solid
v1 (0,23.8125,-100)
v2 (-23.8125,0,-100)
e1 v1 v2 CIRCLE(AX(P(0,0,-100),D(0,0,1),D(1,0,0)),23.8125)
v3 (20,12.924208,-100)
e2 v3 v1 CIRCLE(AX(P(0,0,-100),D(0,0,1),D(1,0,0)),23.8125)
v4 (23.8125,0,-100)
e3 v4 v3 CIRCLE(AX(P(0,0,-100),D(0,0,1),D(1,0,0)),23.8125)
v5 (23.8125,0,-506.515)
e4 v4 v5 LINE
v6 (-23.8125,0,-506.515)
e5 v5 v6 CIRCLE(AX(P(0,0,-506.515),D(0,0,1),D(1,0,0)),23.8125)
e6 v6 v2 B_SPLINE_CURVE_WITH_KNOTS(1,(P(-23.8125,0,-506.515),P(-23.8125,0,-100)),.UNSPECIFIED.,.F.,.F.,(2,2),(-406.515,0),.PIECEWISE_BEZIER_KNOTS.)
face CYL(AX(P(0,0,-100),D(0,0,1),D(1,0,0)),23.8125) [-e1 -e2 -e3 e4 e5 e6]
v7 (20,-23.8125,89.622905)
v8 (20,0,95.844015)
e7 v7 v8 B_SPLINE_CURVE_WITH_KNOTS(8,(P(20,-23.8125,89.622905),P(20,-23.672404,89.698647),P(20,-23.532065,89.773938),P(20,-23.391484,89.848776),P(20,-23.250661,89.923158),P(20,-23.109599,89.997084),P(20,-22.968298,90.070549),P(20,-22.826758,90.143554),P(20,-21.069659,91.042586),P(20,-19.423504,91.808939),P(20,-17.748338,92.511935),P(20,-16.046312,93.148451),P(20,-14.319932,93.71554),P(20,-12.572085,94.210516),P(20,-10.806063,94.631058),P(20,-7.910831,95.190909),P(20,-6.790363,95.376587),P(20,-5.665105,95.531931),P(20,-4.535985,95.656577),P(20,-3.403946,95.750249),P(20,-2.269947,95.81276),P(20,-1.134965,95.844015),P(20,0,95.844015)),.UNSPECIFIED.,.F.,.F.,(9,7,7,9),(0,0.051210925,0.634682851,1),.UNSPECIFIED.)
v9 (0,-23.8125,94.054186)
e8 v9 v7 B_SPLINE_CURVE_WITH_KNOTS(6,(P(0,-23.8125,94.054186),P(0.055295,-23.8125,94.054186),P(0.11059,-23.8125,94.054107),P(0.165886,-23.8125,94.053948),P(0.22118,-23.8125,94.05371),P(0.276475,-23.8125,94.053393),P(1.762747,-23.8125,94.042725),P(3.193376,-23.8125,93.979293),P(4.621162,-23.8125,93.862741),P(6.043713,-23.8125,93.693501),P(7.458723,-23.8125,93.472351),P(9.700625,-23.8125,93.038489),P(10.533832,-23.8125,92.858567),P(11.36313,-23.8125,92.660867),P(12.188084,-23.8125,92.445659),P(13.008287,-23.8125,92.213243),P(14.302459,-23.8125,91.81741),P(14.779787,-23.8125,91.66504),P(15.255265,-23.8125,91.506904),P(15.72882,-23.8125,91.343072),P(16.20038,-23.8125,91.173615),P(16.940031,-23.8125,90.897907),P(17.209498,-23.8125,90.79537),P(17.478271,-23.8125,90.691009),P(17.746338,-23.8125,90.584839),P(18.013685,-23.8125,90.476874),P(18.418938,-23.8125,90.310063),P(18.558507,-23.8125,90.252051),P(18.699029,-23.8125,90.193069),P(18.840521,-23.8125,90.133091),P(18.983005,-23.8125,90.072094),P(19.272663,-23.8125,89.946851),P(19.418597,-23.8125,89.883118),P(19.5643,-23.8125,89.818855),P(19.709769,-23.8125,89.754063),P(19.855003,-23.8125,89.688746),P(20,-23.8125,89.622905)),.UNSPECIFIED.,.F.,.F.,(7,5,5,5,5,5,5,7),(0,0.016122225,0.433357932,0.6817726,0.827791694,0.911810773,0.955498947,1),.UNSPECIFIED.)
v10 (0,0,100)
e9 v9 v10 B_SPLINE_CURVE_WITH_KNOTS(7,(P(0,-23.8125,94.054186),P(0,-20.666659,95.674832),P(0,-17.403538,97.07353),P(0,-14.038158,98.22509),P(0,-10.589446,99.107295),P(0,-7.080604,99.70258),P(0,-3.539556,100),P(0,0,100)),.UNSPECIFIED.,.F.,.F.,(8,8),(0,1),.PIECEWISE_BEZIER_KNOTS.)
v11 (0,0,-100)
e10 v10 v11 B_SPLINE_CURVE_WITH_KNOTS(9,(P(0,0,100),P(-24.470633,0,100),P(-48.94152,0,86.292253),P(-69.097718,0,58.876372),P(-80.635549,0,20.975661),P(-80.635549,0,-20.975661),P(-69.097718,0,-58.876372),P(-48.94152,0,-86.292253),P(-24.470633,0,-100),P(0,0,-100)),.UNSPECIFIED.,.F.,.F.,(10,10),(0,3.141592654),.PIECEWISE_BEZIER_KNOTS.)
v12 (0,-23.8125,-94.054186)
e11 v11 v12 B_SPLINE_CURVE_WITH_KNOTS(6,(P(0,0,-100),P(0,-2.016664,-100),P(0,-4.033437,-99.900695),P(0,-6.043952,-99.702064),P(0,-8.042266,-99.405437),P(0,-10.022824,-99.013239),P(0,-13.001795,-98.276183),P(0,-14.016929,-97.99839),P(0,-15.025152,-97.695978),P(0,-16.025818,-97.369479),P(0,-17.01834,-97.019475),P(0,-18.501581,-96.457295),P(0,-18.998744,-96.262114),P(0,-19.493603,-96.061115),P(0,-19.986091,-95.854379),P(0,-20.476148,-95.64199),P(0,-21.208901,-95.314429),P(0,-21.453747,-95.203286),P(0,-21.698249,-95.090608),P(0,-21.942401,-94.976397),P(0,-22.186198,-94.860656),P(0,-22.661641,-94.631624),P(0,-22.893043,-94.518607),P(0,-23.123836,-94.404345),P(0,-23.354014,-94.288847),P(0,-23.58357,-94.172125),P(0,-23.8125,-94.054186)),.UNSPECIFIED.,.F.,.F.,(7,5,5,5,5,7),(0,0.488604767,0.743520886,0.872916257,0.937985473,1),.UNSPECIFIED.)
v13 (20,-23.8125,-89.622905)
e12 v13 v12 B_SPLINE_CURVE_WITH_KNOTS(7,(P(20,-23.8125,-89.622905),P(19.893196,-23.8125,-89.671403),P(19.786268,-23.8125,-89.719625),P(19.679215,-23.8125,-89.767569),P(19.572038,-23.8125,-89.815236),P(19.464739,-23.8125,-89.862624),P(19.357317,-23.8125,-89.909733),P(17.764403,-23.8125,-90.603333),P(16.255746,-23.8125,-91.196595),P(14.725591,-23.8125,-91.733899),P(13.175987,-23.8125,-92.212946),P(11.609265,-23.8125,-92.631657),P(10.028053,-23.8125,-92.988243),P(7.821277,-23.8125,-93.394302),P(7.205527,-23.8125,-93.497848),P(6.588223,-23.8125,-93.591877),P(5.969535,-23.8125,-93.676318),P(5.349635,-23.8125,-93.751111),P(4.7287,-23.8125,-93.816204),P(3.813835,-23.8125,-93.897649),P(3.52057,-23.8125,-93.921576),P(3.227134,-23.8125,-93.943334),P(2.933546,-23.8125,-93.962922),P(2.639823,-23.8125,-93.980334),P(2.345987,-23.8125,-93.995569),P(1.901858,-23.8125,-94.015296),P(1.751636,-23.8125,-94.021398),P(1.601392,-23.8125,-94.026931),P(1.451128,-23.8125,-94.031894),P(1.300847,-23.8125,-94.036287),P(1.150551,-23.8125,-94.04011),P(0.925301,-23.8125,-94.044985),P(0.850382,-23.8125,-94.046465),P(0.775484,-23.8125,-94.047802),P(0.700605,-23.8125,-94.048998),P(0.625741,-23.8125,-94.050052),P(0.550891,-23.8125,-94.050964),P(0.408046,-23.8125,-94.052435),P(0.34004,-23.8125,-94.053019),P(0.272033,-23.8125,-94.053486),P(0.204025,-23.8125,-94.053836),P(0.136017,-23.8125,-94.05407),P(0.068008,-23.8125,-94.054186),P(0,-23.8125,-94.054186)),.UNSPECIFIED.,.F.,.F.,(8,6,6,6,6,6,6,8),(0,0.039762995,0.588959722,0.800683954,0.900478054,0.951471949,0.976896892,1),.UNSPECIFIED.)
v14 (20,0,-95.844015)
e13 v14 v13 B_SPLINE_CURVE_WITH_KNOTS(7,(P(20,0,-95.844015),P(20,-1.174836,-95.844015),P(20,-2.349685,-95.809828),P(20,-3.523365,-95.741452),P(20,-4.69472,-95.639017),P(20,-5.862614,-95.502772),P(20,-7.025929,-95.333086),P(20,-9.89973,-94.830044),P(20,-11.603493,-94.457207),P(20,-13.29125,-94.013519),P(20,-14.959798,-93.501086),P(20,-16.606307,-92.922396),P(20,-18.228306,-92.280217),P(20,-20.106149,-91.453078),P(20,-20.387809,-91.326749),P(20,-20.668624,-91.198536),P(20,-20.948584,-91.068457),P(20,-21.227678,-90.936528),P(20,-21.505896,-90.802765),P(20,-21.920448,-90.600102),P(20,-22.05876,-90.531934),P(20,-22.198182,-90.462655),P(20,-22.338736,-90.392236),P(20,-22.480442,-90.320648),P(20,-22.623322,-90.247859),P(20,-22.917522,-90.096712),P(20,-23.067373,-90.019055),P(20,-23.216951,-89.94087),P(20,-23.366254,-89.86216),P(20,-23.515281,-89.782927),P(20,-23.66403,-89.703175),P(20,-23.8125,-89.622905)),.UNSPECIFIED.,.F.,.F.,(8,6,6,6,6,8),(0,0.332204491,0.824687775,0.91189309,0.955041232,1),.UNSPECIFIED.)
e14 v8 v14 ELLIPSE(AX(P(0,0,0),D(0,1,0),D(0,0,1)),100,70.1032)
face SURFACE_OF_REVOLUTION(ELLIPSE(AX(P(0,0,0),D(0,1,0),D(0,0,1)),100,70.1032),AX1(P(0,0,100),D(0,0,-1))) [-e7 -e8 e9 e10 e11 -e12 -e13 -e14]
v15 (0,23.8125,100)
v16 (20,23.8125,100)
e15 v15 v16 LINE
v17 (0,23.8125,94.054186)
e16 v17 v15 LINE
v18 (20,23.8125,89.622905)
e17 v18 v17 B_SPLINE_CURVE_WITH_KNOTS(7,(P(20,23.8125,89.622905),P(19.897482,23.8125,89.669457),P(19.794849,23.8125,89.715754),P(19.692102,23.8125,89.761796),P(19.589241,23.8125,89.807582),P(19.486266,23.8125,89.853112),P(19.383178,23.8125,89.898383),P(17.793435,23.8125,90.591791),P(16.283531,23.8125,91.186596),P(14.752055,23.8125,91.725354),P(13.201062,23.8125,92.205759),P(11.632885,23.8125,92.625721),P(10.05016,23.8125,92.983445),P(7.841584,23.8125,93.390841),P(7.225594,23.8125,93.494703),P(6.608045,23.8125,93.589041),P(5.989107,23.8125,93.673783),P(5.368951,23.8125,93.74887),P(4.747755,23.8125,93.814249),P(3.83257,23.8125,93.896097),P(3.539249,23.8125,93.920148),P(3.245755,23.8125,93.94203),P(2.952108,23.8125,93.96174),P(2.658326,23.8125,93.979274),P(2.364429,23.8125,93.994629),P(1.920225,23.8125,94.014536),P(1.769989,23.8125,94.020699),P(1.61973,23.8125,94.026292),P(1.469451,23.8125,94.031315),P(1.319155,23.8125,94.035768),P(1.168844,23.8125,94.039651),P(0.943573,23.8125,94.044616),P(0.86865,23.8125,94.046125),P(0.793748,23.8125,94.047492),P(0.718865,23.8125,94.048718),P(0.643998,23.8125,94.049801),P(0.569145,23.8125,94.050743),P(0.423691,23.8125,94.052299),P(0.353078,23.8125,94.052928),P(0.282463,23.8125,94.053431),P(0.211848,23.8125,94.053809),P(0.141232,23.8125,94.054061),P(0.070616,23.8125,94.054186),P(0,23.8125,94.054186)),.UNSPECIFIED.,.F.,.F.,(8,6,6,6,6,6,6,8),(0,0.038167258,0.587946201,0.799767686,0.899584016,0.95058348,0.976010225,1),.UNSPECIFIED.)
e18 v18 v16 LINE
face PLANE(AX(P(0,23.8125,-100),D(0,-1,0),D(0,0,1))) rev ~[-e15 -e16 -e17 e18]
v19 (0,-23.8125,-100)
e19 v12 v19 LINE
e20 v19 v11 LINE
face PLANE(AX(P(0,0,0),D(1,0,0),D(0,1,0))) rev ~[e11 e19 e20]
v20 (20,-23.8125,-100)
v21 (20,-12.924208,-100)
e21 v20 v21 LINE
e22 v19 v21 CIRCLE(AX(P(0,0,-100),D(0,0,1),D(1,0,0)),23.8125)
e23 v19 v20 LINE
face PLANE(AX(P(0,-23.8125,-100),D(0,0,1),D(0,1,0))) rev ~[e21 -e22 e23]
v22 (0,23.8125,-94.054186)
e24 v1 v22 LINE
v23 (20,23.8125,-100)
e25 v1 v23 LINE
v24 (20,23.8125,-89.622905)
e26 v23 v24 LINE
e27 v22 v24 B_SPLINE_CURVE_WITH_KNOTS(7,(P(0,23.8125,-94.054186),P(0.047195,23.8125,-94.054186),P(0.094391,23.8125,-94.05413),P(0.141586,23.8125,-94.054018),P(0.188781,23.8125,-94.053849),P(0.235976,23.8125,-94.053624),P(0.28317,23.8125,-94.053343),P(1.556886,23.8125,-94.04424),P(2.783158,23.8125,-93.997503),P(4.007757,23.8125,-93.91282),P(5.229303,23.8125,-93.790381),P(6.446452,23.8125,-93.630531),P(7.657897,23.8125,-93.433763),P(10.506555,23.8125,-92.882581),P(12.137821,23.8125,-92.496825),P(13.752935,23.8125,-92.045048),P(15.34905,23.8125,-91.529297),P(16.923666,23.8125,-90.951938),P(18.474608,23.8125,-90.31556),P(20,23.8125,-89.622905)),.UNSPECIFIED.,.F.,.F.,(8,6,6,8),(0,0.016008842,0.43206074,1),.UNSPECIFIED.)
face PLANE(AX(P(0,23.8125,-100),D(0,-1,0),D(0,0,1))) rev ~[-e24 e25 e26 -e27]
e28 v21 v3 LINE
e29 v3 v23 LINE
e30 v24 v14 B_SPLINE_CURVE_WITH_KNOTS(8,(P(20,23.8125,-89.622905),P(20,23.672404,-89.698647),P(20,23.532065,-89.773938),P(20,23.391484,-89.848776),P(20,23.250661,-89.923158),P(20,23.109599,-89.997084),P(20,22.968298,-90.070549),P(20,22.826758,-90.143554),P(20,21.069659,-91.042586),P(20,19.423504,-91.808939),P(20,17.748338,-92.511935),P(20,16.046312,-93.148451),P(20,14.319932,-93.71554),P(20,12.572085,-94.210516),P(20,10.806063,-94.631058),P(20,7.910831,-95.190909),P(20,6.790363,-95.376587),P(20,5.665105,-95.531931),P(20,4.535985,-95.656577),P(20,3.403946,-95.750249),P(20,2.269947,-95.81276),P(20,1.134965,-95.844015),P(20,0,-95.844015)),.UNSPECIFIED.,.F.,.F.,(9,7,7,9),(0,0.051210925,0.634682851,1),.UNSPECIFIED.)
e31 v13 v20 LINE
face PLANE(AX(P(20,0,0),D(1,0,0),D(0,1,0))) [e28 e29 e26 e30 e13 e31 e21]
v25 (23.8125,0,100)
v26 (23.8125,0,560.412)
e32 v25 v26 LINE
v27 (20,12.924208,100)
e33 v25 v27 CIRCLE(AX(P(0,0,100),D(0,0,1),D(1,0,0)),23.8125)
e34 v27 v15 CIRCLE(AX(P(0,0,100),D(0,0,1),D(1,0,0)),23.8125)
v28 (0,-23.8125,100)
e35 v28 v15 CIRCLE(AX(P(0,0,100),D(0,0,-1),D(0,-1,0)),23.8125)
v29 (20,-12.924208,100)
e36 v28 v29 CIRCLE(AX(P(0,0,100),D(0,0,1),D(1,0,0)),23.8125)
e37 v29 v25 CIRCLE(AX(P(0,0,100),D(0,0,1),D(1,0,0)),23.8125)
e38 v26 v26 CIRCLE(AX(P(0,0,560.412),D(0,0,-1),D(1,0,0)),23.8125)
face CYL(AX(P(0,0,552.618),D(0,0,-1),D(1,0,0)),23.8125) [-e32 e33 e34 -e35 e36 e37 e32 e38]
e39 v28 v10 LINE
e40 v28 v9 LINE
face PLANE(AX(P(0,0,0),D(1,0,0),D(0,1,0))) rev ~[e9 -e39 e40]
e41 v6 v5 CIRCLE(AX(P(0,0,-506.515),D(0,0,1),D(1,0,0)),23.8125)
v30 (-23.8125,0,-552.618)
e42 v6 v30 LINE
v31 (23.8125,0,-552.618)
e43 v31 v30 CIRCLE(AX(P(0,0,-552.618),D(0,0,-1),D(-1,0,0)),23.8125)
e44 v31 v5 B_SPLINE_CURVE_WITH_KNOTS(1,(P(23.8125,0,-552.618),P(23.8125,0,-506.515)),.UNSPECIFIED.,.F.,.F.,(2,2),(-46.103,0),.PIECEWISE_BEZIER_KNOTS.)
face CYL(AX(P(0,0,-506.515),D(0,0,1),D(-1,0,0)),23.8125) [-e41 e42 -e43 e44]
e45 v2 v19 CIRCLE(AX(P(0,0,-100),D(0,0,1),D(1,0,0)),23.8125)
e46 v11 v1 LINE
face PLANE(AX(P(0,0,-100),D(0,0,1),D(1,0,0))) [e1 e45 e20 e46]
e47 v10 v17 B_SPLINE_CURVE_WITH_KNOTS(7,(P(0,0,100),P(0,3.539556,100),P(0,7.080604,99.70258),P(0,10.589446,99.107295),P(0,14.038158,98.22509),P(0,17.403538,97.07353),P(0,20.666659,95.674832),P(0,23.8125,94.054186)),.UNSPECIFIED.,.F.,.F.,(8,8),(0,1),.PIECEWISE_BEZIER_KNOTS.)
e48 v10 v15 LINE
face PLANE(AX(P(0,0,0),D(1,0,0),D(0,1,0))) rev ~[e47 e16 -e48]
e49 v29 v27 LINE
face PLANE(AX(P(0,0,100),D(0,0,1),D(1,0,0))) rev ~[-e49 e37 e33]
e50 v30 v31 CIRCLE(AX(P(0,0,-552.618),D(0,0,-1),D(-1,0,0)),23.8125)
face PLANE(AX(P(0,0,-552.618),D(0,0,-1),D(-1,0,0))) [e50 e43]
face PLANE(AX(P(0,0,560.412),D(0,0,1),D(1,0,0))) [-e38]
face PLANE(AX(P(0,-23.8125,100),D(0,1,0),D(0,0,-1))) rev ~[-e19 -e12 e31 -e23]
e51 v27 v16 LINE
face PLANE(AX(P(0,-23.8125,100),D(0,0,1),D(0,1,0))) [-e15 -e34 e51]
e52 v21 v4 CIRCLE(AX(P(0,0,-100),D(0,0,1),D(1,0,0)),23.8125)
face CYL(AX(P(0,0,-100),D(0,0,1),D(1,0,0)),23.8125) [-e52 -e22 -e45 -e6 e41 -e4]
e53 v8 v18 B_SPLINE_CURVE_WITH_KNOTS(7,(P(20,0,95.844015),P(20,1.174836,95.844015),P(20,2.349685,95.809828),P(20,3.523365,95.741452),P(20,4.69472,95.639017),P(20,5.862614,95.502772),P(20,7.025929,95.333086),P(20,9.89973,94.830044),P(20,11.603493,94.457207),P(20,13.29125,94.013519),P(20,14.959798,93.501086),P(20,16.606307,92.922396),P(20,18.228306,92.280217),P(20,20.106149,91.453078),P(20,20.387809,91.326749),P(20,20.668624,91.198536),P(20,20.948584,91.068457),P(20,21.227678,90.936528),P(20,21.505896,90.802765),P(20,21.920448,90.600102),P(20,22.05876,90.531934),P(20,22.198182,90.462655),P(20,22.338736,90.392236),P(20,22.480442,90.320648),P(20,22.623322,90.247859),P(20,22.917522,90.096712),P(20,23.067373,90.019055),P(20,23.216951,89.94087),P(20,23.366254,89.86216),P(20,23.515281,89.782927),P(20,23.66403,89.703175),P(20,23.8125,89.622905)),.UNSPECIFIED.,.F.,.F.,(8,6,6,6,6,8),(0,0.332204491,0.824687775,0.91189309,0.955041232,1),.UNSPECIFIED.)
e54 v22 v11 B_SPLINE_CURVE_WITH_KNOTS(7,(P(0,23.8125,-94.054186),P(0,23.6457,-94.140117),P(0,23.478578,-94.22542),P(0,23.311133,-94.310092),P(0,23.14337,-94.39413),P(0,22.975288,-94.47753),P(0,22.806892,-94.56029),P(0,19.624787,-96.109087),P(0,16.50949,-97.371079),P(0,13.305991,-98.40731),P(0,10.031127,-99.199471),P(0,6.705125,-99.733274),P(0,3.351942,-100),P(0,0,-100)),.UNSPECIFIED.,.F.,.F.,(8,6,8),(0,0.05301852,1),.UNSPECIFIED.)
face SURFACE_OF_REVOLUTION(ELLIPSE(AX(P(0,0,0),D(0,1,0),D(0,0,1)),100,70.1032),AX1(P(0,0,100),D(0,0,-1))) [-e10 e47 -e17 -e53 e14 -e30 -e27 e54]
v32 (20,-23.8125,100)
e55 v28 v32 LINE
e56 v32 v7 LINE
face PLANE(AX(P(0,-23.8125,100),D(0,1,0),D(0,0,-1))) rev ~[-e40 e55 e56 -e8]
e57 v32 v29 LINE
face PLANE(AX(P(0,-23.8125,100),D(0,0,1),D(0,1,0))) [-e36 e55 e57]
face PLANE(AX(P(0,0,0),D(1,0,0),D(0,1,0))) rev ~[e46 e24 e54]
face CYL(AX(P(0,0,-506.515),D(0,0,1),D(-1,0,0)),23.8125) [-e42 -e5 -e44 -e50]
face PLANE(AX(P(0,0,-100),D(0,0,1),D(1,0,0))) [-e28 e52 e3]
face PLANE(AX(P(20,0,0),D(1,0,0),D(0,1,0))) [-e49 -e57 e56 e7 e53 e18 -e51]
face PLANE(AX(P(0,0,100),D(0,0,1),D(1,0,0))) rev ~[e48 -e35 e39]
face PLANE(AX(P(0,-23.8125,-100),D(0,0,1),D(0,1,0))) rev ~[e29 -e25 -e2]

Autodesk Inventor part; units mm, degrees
ref_plane "YZ Plane" through (0, 0, 0) normal (1, 0, 0) x (0, 1, 0)
sketch "Sketch3" plane through (0, 0, 0) normal (0, 1, 0) x (-1, 0, 0)
  ellipse E0 centre (0, 0) end of major axis (0, 100) minor radius 70.1032
  line L0 (0, 100) -> (0, -100)
  dimension "d6" = 100
revolve "Revolution2" add sketch "Sketch3" angle 360 about axis through (0, 0, 100) along (0, 0, -1) picked at (-23.3548, 1.1091) contours L0 E0
ref_plane "Work Plane2" through (0, 0, -100) normal (0, 0, 1) x (1, 0, 0)
sketch "Sketch4" plane through (0, 0, -100) normal (0, 0, 1) x (1, 0, 0)
  line L0 (70.1032, 0) -> (0, 0) projected
  circle A0 centre (0, 0) radius 23.8125
  dimension "d9" = 47.625
extrude "Extrusion1" add sketch "Sketch4" against normal blind 406.515
ref_plane "Work Plane3" through (0, 0, 100) normal (0, 0, 1) x (1, 0, 0)
sketch "Sketch5" plane through (0, 0, 100) normal (0, 0, 1) x (1, 0, 0)
  line L0 (70.1032, 0) -> (0, 0) projected
  circle A0 centre (0, 0) radius 23.8125
  point P0 (23.8125, 0)
extrude "Extrusion2" add sketch "Sketch5" along normal blind 406.515
sketch "Sketch6" plane through (0, 0, -506.515) normal (0, 0, -1) x (-1, 0, 0)
  circle A0 centre (0, 0) radius 23.8125
extrude "Extrusion3" add sketch "Sketch6" along normal blind 46.103
sketch "Sketch7" plane through (0, 0, 506.515) normal (0, 0, 1) x (1, 0, 0)
  circle A0 centre (0, 0) radius 23.8125
extrude "Extrusion4" add sketch "Sketch7" along normal blind 46.103
sketch "Sketch8" plane through (0, 0, 552.618) normal (0, 0, 1) x (1, 0, 0)
  circle A0 centre (0, 0) radius 23.8125
extrude "Extrusion5" add sketch "Sketch8" along normal blind 7.794
sketch "Sketch9" plane through (0, 0, 0) normal (1, 0, 0) x (0, 1, 0)
  line L0 (-23.8125, -100) -> (23.8125, -100) projected
  line L1 (-23.8125, 100) -> (23.8125, 100) projected
  line L2 (-23.8125, -100) -> (23.8125, -100)
  line L3 (23.8125, -100) -> (23.8125, 100)
  line L4 (23.8125, 100) -> (-23.8125, 100)
  line L5 (-23.8125, 100) -> (-23.8125, -100)
  point P0 (0, 0)
extrude "Extrusion6" add sketch "Sketch9" along normal blind 20
properties part number "Differential"
